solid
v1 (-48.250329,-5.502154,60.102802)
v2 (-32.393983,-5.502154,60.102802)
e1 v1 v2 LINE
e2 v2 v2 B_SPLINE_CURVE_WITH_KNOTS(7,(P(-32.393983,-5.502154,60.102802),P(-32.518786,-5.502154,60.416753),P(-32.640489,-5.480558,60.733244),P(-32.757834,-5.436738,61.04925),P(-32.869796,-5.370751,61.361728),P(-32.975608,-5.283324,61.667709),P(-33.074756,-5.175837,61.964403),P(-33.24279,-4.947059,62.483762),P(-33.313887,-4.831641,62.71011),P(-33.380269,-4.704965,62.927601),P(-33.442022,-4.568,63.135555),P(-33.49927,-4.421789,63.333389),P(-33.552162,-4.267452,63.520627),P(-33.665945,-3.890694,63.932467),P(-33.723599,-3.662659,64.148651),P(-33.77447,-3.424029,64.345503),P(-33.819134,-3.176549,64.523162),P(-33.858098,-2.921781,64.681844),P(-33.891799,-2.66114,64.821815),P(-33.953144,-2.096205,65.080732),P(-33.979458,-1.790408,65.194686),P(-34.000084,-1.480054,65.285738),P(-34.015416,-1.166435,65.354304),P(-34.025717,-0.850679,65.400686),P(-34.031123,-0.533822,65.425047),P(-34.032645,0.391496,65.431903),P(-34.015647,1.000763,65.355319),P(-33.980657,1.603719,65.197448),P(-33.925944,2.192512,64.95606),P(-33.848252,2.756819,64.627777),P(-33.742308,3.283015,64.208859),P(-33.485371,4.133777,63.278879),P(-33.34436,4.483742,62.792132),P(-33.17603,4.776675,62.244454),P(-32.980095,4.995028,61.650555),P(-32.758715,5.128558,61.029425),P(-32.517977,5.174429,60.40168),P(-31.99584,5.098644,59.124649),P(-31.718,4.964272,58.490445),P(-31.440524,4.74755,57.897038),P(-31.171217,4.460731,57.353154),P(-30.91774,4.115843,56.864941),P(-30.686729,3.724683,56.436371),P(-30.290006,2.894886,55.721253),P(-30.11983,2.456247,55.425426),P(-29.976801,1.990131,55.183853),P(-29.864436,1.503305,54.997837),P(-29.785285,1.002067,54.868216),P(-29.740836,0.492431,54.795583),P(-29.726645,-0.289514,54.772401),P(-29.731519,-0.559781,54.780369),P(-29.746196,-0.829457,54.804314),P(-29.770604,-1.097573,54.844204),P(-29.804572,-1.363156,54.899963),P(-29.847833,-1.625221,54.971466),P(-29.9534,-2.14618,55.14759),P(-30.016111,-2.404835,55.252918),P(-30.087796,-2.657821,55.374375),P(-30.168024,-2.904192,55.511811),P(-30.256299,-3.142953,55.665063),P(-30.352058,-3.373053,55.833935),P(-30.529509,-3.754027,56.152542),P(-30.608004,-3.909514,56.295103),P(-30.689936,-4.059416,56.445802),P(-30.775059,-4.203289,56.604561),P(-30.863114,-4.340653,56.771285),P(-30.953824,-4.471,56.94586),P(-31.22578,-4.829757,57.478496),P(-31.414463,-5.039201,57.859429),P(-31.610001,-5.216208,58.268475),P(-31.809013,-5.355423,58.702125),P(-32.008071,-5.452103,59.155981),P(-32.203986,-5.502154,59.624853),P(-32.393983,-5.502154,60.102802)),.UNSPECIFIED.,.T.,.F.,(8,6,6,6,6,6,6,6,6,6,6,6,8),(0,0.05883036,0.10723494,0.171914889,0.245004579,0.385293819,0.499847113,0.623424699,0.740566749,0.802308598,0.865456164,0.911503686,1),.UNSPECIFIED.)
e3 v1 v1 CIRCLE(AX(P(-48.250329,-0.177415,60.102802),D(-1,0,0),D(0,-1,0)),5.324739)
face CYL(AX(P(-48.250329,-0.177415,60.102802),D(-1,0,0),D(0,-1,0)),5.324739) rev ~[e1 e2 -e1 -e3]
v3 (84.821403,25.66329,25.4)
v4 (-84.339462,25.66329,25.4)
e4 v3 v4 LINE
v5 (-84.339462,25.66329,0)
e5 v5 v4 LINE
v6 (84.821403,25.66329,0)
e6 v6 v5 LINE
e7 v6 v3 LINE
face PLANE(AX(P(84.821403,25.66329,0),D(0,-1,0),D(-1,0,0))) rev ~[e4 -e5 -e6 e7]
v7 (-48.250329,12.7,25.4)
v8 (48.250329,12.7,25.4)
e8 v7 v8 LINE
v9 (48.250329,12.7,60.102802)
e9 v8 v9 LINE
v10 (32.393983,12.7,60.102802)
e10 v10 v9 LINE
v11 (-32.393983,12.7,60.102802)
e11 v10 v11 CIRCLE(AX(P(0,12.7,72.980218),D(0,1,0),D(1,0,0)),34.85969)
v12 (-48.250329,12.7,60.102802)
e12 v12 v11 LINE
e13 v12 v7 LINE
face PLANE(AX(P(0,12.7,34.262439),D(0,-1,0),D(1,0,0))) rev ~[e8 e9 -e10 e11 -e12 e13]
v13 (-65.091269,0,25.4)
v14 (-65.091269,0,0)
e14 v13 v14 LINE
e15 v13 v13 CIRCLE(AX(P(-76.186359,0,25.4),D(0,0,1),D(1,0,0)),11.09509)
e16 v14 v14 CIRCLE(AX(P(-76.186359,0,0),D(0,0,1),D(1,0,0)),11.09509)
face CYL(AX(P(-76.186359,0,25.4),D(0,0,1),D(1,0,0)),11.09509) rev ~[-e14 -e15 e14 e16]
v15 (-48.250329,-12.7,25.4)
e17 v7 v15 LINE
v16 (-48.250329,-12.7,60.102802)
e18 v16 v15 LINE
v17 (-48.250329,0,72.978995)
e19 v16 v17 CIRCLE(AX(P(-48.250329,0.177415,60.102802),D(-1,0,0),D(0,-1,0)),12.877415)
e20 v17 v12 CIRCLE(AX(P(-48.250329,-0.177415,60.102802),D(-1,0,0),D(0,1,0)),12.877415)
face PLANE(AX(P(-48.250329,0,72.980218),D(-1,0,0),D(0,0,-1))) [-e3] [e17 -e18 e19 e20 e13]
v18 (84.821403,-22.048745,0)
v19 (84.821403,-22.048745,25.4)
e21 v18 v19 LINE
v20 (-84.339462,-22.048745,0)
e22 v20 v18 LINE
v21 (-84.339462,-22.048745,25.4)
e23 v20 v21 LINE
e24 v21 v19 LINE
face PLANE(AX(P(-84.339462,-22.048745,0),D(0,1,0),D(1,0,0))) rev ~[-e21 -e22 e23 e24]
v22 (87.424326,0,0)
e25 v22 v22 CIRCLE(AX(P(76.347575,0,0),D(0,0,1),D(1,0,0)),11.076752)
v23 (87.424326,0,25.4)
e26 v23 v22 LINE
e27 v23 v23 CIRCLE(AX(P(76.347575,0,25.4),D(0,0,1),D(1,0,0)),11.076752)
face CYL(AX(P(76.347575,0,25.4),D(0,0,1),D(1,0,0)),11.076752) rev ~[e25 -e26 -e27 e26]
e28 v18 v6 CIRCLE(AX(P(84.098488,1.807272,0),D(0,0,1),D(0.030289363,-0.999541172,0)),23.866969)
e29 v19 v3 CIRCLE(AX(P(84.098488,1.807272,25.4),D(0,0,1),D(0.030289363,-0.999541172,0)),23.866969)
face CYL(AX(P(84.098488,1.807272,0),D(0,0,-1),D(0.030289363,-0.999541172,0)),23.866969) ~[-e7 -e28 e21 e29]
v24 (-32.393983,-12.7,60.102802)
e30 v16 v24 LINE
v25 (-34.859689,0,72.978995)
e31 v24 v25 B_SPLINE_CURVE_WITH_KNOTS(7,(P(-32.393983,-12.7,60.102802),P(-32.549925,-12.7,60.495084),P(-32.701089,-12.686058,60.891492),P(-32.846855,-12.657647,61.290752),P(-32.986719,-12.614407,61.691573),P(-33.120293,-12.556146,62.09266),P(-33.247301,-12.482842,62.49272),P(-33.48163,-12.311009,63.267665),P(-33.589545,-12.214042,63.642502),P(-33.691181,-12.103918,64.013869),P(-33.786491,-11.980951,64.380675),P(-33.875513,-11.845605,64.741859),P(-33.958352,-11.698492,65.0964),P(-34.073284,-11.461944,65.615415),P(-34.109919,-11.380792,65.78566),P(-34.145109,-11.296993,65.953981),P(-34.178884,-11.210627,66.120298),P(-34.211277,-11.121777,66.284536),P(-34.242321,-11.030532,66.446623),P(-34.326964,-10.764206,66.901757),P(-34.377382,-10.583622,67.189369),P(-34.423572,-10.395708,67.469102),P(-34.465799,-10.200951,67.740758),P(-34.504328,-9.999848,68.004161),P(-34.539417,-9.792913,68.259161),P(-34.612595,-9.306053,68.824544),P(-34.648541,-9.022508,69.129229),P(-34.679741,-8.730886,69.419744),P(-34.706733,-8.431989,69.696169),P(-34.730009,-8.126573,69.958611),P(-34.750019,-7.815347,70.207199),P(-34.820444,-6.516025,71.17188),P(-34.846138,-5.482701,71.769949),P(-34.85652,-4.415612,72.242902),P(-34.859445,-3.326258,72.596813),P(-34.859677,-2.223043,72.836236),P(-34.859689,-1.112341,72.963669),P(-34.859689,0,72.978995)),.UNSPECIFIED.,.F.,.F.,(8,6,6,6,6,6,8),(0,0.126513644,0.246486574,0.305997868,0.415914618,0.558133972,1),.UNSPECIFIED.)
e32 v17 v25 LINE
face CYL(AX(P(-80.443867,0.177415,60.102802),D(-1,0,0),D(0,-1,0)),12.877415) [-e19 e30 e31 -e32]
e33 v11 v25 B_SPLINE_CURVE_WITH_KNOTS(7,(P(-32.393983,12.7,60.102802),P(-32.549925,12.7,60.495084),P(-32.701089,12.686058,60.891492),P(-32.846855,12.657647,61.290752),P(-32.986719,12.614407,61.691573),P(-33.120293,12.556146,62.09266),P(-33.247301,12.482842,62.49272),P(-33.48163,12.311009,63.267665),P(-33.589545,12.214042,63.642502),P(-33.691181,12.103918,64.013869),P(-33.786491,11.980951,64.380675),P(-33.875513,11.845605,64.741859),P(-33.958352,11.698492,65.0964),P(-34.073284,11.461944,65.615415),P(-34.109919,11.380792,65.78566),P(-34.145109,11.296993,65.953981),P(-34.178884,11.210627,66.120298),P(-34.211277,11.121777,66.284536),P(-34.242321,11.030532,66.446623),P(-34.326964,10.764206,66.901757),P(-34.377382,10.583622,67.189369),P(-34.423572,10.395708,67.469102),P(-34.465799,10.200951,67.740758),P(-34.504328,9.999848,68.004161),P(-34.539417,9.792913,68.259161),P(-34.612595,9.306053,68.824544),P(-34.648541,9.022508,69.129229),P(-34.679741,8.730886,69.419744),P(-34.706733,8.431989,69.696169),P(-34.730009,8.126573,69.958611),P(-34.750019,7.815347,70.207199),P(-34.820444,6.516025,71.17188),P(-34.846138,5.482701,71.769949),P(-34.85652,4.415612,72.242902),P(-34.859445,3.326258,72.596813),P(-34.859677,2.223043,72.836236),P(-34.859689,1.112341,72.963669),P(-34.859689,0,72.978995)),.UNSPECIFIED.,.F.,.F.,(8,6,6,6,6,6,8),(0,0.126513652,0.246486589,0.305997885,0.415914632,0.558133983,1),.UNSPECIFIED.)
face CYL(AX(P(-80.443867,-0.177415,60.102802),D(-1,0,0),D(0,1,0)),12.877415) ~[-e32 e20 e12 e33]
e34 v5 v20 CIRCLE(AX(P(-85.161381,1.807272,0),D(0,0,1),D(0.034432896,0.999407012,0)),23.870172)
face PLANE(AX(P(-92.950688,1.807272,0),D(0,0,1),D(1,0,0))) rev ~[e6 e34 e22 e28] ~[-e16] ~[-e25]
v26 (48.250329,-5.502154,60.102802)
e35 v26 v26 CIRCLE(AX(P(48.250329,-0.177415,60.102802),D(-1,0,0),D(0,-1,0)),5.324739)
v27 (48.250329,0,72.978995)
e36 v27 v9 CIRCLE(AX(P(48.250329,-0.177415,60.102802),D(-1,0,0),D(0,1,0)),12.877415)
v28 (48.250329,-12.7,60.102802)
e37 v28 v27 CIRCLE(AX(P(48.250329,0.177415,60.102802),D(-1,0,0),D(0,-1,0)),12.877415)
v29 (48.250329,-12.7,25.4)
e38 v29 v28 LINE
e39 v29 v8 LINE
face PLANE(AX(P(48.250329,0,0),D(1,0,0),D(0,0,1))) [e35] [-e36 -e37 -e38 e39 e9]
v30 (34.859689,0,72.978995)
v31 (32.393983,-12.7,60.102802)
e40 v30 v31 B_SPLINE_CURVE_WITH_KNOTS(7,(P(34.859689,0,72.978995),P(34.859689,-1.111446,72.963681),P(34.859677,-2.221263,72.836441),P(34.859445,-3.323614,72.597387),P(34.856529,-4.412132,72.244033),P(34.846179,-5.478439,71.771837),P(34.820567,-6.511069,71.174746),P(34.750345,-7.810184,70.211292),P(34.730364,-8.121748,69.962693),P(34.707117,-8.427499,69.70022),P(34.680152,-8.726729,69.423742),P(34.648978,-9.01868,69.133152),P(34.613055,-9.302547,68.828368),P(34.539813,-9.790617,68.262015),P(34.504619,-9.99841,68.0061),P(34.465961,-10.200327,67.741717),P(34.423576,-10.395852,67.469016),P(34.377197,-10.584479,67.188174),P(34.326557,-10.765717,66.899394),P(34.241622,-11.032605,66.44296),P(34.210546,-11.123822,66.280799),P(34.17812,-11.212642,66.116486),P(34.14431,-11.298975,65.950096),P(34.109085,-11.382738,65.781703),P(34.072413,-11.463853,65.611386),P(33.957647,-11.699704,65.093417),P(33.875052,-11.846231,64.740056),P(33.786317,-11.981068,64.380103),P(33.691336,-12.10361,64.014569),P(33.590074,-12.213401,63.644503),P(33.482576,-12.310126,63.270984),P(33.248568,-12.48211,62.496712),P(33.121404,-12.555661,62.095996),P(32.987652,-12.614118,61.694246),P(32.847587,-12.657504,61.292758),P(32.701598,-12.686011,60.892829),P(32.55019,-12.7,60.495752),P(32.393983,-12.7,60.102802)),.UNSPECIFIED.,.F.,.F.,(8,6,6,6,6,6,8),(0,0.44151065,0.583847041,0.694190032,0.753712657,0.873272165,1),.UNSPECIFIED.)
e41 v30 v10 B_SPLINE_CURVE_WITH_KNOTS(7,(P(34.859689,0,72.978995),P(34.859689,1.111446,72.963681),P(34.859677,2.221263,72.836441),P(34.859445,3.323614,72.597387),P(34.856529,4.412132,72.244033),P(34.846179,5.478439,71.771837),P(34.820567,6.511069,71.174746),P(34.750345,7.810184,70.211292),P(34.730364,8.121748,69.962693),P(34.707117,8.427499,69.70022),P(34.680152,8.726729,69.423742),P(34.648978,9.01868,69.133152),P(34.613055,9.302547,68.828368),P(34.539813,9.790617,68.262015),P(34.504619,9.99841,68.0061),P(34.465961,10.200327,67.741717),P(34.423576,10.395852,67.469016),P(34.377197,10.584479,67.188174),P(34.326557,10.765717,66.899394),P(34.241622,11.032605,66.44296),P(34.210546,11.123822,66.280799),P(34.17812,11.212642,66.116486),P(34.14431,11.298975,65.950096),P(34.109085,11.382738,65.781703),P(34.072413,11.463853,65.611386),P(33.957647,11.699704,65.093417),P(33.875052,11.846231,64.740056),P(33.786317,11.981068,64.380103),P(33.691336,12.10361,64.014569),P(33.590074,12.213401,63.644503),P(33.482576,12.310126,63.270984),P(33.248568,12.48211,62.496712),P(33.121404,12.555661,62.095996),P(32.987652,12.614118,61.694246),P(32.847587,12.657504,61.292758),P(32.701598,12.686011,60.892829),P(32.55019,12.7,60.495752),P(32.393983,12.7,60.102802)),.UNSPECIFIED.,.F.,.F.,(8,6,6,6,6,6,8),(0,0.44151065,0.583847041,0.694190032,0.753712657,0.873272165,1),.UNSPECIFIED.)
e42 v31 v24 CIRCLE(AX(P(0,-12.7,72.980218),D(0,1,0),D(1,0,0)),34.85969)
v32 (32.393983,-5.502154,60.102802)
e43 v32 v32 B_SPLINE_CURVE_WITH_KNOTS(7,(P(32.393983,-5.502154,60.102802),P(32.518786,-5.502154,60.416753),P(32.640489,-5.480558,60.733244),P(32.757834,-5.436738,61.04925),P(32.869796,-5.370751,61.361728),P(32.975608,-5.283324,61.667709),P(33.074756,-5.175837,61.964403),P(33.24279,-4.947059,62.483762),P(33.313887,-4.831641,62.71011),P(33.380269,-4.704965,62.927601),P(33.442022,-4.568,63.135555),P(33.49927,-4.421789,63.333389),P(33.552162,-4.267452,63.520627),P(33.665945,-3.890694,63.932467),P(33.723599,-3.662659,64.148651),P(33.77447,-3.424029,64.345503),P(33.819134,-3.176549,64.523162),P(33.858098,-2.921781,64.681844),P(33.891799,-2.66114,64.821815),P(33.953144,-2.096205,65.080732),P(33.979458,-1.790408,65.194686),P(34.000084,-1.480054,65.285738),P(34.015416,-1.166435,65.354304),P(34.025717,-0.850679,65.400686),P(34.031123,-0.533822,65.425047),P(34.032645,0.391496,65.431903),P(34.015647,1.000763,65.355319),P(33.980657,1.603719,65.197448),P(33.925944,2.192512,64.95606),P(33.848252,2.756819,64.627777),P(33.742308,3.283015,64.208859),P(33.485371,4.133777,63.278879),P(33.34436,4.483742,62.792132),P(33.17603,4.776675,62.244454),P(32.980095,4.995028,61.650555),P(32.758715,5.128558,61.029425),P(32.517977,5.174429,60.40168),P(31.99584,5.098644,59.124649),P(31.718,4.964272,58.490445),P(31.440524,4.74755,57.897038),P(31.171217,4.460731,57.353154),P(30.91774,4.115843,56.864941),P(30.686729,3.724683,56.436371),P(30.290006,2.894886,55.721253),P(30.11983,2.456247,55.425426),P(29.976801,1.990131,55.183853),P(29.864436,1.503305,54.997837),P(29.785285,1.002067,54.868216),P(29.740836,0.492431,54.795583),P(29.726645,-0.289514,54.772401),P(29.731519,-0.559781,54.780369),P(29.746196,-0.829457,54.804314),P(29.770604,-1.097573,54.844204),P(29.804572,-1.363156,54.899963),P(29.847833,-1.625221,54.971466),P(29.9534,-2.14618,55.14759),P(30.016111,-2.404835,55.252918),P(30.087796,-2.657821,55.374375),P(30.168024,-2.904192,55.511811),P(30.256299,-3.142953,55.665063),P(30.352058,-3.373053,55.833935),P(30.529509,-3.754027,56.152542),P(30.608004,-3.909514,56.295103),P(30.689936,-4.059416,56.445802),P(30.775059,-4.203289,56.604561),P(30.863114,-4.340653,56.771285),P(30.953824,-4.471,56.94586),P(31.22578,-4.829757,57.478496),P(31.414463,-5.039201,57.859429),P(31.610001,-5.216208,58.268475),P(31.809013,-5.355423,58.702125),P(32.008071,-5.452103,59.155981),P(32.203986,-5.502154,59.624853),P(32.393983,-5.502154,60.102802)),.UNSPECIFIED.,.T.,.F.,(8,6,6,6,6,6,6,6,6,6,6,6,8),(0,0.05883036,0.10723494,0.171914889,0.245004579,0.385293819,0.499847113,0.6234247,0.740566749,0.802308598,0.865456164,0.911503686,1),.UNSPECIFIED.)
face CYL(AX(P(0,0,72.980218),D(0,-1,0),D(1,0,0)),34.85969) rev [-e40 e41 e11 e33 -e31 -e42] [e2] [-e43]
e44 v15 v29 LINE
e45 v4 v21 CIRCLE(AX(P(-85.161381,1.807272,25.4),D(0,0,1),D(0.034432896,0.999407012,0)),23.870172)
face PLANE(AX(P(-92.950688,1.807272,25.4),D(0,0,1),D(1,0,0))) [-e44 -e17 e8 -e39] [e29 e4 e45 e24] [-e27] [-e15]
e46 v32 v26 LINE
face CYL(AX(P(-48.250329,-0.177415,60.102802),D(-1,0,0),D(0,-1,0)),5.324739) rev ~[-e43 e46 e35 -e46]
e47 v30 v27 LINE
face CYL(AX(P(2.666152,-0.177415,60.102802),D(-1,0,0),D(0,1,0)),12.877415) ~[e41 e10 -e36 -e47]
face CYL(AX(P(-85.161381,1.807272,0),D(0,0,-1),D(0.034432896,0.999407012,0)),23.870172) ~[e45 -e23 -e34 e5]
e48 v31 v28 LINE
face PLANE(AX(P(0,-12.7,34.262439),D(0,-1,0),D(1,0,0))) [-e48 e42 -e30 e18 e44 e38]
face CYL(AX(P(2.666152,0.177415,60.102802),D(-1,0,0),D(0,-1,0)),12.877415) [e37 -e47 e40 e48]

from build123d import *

# Parameters (mm, degrees)
F1_DEPTH    = 25.4
F2_R        = 11.0950895879
F2_R_2      = 11.0767516797
F3_DEPTH    = 51.816
F5_DEPTH    = 12.7
F6_T1_DEPTH = 77.7777149491
F6_T3_DEPTH = 77.7777149491
F7_R        = 5.3247390171
F8_DEPTH    = 189.484


# Not quite as in the source:
# - a fillet or chamfer that OpenCascade refuses, or shapes differently, is made with other operations: its cross-section is extruded or revolved along the edge and cut away or added


with BuildPart() as f1:
    # F0 (on Top) → F1 (new body)
    with BuildSketch(Plane.XY):
        with BuildLine():
            Line((-84.3394622207, -22.0487453043), (-84.3394622207, 25.6632901728))
            ThreePointArc((-84.3394622207, 25.6632901728), (-109.0315538503, 1.8072724342), (-84.3394622207, -22.0487453043))
        make_face()
        Polygon((83.375572493, 25.6632901728), (-84.3394622207, 25.6632901728), (-84.3394622207, -22.0487453043), (83.375572493, -22.0487453043), (84.8214030266, -22.0487453043), (84.8214030266, 25.6632901728), align=None)
        with BuildLine():
            ThreePointArc((84.8214030266, -22.0487453043), (107.965456332, 1.8072724342), (84.8214030266, 25.6632901728))
            Line((84.8214030266, 25.6632901728), (84.8214030266, -22.0487453043))
        make_face()
    extrude(amount=F1_DEPTH)

    # F2 (on face) → F3 (cut)
    with BuildSketch(Plane.XY.offset(25.4)):
        with Locations((-76.1863589287, 0)):
            Circle(F2_R)
        with Locations((76.3475745916, 0)):
            Circle(F2_R_2)
    extrude(amount=-F3_DEPTH, mode=Mode.SUBTRACT)

    # F4 (on Front) → F5 (join, symmetric)
    with BuildSketch(Plane.XZ):
        with BuildLine():
            Line((-34.8596895088, 72.9802176356), (-48.2503287494, 72.9802176356))
            Line((-48.2503287494, 72.9802176356), (-48.2503287494, 0))
            Line((-48.2503287494, 0), (48.2503287494, 0))
            Line((48.2503287494, 0), (48.2503287494, 72.9802176356))
            Line((48.2503287494, 72.9802176356), (34.8596895088, 72.9802176356))
            ThreePointArc((34.8596895088, 72.9802176356), (0, 38.1205281268), (-34.8596895088, 72.9802176356))
        make_face()
    extrude(amount=F5_DEPTH, both=True)

    # F6: fillet of radius 12.8774151417 on 4 edges, made by hand

    # F6_s2 → F6_t1 (cut)
    with BuildSketch(Plane.YZ.offset(-80.4438666037)):
        with BuildLine():
            ThreePointArc((-12.7, 60.1028024939), (-8.9282924292, 69.2085100648), (0.1774151417, 72.9802176356))
            Line((0.1774151417, 72.9802176356), (-12.7, 72.9802176356))
            Line((-12.7, 72.9802176356), (-12.7, 60.1028024939))
        make_face()
        with BuildLine():
            ThreePointArc((12.7, 60.1028024939), (8.9282924292, 69.2085100648), (-0.1774151417, 72.9802176356))
            Line((-0.1774151417, 72.9802176356), (12.7, 72.9802176356))
            Line((12.7, 72.9802176356), (12.7, 60.1028024939))
        make_face()
    extrude(amount=F6_T1_DEPTH, mode=Mode.SUBTRACT)

    # F6_s4 → F6_t3 (cut)
    with BuildSketch(Plane.YZ.offset(2.6661516546)):
        with BuildLine():
            ThreePointArc((12.7, 60.1028024939), (8.9282924292, 69.2085100648), (-0.1774151417, 72.9802176356))
            Line((-0.1774151417, 72.9802176356), (12.7, 72.9802176356))
            Line((12.7, 72.9802176356), (12.7, 60.1028024939))
        make_face()
        with BuildLine():
            ThreePointArc((-12.7, 60.1028024939), (-8.9282924292, 69.2085100648), (0.1774151417, 72.9802176356))
            Line((0.1774151417, 72.9802176356), (-12.7, 72.9802176356))
            Line((-12.7, 72.9802176356), (-12.7, 60.1028024939))
        make_face()
    extrude(amount=F6_T3_DEPTH, mode=Mode.SUBTRACT)

    # F7 (on face) → F8 (cut)
    with BuildSketch(Plane(origin=(-48.2503287494, 0, 0), x_dir=(0, -1, 0), z_dir=(-1, 0, 0))):
        with Locations((0.1774151417, 60.1028024939)):
            Circle(F7_R)
    extrude(amount=-F8_DEPTH, mode=Mode.SUBTRACT)


solid = f1.part
